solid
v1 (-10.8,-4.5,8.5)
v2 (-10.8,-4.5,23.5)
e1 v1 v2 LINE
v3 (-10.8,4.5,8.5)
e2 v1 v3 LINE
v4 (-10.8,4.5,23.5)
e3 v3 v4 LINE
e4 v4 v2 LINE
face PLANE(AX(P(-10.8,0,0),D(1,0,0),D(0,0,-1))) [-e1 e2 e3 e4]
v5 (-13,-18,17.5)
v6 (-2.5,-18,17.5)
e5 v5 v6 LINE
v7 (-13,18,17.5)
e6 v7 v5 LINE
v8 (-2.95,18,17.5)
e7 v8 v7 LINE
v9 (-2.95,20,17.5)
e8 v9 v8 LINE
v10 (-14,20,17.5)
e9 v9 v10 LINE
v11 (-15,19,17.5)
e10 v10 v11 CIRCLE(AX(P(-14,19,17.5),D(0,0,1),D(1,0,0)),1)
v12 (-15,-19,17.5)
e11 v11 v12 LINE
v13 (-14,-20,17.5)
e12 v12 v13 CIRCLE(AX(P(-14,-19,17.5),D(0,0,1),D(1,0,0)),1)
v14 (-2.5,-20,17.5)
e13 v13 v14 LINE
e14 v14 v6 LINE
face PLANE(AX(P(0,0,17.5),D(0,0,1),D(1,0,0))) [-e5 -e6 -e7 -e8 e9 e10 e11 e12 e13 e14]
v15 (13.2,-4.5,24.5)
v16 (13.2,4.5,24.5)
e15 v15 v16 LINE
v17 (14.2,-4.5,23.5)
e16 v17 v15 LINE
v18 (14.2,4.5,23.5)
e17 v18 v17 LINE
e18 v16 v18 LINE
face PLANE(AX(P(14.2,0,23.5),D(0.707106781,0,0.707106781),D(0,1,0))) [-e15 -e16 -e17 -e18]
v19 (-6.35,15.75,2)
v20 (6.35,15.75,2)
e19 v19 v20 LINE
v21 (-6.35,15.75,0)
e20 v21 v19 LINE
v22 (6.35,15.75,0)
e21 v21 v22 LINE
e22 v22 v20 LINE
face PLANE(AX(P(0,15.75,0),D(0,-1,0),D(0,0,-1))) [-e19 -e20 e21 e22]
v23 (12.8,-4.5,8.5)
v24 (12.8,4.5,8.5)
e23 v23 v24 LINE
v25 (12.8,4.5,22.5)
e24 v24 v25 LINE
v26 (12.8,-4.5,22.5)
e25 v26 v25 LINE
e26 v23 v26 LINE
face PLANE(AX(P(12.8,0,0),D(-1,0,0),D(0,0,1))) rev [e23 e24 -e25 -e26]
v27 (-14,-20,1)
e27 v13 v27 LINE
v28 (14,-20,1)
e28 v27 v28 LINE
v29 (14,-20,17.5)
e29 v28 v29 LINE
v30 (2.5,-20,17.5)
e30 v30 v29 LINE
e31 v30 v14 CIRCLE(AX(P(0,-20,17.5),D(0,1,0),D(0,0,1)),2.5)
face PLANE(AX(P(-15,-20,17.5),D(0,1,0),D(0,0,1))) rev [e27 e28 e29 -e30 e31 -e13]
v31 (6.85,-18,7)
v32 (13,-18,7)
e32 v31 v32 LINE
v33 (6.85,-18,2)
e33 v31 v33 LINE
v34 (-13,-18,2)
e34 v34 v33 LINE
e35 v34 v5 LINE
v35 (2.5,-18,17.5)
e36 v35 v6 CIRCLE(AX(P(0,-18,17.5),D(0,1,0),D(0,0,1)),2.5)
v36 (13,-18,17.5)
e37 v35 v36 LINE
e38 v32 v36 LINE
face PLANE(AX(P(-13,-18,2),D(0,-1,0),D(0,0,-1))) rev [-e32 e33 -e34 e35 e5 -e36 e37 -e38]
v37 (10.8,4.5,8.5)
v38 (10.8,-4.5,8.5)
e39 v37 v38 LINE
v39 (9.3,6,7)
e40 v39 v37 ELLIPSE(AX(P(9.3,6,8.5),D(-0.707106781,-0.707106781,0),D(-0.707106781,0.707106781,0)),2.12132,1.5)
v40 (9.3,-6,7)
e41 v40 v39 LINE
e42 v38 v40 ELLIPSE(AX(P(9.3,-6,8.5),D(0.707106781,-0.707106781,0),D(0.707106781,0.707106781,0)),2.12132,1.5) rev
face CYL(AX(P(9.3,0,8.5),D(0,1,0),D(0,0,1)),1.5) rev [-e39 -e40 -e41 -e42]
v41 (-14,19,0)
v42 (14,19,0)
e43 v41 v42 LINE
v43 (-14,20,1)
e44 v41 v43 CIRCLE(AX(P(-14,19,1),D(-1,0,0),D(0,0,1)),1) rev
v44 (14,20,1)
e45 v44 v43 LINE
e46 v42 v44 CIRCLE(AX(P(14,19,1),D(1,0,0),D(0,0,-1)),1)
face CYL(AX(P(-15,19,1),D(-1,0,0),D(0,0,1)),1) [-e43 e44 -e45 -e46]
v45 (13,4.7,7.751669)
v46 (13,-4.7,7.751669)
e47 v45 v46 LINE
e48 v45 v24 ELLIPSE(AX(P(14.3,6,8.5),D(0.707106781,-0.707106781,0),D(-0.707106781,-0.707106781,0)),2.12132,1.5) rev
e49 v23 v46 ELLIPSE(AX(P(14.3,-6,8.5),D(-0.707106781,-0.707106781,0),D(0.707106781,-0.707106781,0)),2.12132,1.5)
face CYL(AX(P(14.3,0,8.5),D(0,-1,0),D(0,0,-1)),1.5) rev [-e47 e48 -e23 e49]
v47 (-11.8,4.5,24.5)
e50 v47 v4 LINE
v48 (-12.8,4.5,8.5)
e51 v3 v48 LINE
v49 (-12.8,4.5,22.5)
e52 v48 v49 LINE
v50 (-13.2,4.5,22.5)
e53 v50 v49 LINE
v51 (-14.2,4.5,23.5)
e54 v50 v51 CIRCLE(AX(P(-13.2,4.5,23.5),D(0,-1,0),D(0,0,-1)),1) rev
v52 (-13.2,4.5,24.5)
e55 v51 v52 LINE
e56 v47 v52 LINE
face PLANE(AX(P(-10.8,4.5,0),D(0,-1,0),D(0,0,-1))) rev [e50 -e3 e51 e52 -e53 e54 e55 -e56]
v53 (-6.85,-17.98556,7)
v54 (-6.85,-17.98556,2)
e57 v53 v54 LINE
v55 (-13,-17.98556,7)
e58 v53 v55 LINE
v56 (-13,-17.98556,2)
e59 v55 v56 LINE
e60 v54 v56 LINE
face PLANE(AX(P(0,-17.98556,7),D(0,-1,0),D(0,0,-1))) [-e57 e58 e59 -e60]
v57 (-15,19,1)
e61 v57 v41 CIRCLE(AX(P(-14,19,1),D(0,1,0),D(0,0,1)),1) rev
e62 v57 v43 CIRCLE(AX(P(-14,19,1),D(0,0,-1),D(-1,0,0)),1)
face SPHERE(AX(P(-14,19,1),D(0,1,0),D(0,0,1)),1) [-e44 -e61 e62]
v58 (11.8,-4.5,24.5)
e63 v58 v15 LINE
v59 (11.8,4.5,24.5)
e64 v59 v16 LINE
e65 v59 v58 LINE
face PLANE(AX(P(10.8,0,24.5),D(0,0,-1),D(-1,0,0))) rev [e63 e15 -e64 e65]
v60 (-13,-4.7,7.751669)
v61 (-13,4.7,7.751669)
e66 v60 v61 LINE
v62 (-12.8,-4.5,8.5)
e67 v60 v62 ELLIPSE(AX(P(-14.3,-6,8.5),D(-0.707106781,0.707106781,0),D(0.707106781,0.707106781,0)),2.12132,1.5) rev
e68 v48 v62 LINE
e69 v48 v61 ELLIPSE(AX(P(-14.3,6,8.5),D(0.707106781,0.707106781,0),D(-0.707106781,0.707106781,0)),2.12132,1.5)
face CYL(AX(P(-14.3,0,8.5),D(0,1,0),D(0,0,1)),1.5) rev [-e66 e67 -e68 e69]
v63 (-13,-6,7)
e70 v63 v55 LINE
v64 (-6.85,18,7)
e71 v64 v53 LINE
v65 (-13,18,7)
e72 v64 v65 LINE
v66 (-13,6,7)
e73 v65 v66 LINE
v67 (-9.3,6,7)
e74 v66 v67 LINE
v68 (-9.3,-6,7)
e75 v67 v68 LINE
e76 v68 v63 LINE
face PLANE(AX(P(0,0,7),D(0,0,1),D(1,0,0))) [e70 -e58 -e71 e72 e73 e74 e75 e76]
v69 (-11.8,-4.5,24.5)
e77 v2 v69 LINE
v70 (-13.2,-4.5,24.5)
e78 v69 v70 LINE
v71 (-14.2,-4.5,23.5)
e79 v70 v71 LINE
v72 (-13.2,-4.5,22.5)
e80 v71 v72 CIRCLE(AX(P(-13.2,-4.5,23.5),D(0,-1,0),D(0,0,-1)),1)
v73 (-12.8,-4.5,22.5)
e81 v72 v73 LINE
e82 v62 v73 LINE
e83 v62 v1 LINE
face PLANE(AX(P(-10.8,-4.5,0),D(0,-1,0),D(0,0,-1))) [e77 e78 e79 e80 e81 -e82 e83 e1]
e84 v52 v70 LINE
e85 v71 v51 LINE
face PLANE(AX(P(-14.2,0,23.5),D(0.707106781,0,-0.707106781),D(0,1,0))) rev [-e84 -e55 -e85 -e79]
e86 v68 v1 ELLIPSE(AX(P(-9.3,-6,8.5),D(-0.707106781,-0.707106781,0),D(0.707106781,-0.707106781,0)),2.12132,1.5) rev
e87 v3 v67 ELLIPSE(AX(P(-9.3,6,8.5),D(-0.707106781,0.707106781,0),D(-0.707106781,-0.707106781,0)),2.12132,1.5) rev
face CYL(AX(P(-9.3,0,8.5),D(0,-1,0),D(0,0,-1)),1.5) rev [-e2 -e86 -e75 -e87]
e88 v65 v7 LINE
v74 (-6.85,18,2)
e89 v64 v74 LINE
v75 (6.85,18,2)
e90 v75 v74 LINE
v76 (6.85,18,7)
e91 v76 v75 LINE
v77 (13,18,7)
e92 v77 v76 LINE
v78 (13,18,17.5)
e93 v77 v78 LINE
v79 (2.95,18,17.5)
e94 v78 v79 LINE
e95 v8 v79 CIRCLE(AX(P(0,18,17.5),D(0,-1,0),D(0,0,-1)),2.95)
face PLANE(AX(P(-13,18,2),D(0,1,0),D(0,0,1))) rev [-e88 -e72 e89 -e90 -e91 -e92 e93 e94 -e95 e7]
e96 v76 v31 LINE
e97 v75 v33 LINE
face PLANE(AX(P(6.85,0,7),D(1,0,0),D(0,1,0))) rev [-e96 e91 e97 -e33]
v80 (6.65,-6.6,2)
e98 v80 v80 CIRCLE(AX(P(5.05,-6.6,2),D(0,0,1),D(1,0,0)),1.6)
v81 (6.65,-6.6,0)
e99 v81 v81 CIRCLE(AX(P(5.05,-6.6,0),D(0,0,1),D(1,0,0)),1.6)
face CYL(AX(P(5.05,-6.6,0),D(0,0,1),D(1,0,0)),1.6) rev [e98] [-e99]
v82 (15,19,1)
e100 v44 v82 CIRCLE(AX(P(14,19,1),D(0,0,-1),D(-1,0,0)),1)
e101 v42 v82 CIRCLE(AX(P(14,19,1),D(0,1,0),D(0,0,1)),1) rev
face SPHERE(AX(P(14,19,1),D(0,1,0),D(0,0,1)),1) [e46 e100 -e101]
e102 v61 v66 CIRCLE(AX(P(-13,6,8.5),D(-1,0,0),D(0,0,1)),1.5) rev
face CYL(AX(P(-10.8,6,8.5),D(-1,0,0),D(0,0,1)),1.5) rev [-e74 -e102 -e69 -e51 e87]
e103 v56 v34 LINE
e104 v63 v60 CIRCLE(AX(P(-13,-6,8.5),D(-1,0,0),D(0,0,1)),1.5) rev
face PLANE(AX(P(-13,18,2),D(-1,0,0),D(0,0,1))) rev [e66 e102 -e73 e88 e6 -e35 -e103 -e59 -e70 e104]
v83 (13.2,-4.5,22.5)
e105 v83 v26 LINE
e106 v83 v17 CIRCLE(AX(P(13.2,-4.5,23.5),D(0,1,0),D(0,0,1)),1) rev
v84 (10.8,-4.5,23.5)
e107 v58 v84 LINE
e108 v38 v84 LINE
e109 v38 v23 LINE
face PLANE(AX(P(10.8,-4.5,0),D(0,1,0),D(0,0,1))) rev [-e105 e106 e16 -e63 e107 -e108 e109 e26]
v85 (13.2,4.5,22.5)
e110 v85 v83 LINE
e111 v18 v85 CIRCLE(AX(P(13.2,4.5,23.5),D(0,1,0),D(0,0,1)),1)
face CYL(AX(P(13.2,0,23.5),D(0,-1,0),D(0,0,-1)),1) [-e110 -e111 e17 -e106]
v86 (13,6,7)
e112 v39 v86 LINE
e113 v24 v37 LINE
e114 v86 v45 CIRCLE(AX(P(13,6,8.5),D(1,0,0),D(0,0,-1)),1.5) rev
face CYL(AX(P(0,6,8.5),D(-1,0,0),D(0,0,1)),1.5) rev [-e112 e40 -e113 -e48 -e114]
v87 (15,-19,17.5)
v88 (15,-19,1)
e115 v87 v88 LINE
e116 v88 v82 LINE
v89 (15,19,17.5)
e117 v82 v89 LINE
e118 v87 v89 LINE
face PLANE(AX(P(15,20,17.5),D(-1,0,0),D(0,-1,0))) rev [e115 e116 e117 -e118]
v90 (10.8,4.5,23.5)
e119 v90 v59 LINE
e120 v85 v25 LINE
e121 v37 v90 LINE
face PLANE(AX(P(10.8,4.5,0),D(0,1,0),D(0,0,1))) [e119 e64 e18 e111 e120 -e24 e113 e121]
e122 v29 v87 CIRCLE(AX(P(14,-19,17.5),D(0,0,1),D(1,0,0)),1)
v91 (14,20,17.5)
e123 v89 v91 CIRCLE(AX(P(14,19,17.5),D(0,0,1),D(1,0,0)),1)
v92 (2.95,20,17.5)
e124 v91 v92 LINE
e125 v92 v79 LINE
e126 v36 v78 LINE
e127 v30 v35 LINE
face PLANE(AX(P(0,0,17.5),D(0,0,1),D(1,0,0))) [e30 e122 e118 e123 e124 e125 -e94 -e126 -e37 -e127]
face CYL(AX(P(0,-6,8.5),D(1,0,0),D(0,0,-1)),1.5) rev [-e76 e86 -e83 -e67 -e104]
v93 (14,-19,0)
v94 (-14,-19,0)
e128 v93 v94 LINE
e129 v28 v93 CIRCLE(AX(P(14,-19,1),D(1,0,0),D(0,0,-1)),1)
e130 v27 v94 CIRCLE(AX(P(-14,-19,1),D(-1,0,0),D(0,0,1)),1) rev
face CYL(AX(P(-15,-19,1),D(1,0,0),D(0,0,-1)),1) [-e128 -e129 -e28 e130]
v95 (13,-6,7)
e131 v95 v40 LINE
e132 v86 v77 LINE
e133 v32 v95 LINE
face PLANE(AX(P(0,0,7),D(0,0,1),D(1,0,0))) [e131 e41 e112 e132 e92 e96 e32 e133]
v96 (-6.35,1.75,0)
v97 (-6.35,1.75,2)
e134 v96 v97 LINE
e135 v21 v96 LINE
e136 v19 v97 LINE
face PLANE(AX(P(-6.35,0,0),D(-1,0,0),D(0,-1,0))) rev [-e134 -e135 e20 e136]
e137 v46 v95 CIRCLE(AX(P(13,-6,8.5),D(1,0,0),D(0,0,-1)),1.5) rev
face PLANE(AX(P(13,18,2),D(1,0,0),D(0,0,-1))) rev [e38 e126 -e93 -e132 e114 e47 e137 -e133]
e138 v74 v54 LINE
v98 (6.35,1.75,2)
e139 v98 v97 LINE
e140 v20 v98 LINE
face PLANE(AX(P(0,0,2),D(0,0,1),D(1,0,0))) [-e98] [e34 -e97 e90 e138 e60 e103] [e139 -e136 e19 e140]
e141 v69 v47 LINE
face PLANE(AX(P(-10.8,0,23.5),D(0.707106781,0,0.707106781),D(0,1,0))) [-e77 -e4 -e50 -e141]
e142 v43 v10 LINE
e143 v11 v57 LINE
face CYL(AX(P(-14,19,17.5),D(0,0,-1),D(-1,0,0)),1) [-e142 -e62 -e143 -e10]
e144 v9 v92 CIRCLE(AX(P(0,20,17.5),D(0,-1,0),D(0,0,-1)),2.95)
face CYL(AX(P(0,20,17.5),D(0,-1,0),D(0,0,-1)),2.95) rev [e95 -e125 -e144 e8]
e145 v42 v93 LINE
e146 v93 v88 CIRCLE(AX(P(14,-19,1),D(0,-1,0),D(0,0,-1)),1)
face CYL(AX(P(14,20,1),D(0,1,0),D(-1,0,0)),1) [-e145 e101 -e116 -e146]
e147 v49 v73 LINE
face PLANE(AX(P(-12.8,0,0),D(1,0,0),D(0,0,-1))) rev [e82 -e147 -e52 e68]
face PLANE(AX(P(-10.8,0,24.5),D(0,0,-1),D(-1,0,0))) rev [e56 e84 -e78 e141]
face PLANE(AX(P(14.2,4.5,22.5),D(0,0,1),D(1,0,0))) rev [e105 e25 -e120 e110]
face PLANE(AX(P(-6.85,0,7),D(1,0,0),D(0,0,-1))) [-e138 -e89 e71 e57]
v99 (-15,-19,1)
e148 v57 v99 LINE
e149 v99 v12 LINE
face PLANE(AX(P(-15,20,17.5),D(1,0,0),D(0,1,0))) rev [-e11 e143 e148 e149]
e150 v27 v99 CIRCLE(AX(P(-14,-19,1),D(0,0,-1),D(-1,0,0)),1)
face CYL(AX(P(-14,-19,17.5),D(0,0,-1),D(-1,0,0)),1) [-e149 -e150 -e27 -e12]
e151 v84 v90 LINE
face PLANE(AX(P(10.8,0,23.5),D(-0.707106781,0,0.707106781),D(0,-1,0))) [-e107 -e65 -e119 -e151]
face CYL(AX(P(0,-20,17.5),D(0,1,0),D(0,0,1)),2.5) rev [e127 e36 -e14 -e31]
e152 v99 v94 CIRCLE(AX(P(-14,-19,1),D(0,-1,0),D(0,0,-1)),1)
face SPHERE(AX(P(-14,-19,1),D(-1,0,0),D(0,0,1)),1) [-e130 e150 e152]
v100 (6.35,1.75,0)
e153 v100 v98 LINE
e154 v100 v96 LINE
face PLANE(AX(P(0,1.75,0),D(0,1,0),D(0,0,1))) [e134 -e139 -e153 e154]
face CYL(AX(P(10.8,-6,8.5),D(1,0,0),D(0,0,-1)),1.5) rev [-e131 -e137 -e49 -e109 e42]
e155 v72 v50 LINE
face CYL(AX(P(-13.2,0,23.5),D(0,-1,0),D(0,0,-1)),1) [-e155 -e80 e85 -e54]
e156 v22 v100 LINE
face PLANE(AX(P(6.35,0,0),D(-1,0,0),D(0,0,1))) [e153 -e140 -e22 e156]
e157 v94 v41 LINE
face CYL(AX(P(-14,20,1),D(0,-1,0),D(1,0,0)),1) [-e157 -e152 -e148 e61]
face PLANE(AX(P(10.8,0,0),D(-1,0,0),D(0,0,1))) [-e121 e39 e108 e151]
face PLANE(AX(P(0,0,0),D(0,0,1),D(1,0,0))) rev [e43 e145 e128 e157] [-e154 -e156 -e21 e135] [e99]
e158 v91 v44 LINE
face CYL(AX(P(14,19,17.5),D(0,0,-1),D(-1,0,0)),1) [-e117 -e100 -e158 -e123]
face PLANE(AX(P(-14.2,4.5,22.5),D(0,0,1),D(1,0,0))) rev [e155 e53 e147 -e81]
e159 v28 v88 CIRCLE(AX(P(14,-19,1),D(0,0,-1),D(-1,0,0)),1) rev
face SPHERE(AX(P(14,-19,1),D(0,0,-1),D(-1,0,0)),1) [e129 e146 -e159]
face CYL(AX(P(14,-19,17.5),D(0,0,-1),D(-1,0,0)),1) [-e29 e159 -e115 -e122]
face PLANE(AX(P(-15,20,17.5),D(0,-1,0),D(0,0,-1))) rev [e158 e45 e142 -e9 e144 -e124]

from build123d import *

# Parameters (mm, degrees)
SKETCH1_W           = 30
SKETCH1_H           = 40
BOSS_EXTRUDE1_DEPTH = 17.5
SKETCH2_W           = 26
SKETCH2_H           = 36
CUT_EXTRUDE1_DEPTH  = 15.5
SKETCH3_R           = 1.6
CUT_EXTRUDE2_DEPTH  = 30.41513216
BOSS_EXTRUDE2_DEPTH = 5
CUT_EXTRUDE3_DEPTH  = 45.443784717
CUT_EXTRUDE4_DEPTH  = 45.443784717
BOSS_EXTRUDE3_START = 0.2
SKETCH6_W           = 7
SKETCH6_H           = 9
SKETCH6_W_2         = 10.5
BOSS_EXTRUDE3_DEPTH = 2
FILLET2_R           = 1
BOSS_EXTRUDE7_START = 0.2
SKETCH7_W           = 17.5
SKETCH7_H           = 9
BOSS_EXTRUDE7_DEPTH = 2
SKETCH8_W           = 2
SKETCH8_H           = 9
BOSS_EXTRUDE8_DEPTH = 1.4
FILLET6_R           = 1.5
SKETCH9_W           = 2
SKETCH9_H           = 9
BOSS_EXTRUDE9_DEPTH = 1.4
CHAMFER1_SIZE       = 1
FILLET7_R           = 1


# Some blends are built 0.0001 mm under size
with BuildPart() as part:
    # Sketch1 → Boss-Extrude1 (new body)
    with BuildSketch(Plane.XY):
        Rectangle(SKETCH1_W, SKETCH1_H)
    extrude(amount=BOSS_EXTRUDE1_DEPTH)

    # Sketch2 → Cut-Extrude1 (cut)
    with BuildSketch(Plane.XY.offset(17.5)):
        Rectangle(SKETCH2_W, SKETCH2_H)
    extrude(amount=-CUT_EXTRUDE1_DEPTH, mode=Mode.SUBTRACT)

    # Sketch3 → Cut-Extrude2 (cut, through all)
    with BuildSketch(Plane.XY.offset(2)):
        Polygon((6.35, 1.75), (-6.35, 1.75), (-6.35, 15.75), (0, 15.75), (6.35, 15.75), align=None)
        with Locations((5.05, -6.6)):
            Circle(SKETCH3_R)
    extrude(amount=-CUT_EXTRUDE2_DEPTH, mode=Mode.SUBTRACT)

    # Sketch3<3> → Boss-Extrude2 (add)
    with BuildSketch(Plane.XY.offset(2)):
        Polygon((-6.85, -14), (-6.85, 18), (-13, 18), (-13, -17.985559901), (-6.85, -17.985559901), align=None)
        Polygon((13, 18), (6.85, 18), (6.85, -14), (6.85, -18), (13, -18), align=None)
    extrude(amount=BOSS_EXTRUDE2_DEPTH)

    # Sketch4 → Cut-Extrude3 (cut, through all)
    with BuildSketch(Plane.XZ.offset(-18)):
        with BuildLine():
            Line((-2.95, 17.5), (2.95, 17.5))
            ThreePointArc((2.95, 17.5), (0, 14.55), (-2.95, 17.5))
        make_face()
    extrude(amount=-CUT_EXTRUDE3_DEPTH, mode=Mode.SUBTRACT)

    # Sketch5 → Cut-Extrude4 (cut, through all)
    with BuildSketch(Plane(origin=(0, -18, 0), x_dir=(1, 0, 0), z_dir=(0, 1, 0))):
        with BuildLine():
            Line((-2.5, -17.5), (2.5, -17.5))
            ThreePointArc((2.5, -17.5), (0, -15), (-2.5, -17.5))
        make_face()
    extrude(amount=-CUT_EXTRUDE4_DEPTH, mode=Mode.SUBTRACT)

    # Sketch6 → Boss-Extrude3 (add)
    with BuildSketch(Plane.ZY.offset(-13).offset(BOSS_EXTRUDE3_START)):
        with Locations((21, 0)):
            Rectangle(SKETCH6_W, SKETCH6_H)
        with Locations((12.25, 0)):
            Rectangle(SKETCH6_W_2, SKETCH6_H)
    extrude(amount=BOSS_EXTRUDE3_DEPTH)

    # Fillet2
    fillet2_edges = [part.edges().sort_by_distance(p)[0] for p in [
        (0, -20, 0),
        (-15, 0, 0),
        (0, 20, 0),
        (15, 0, 0),
        (15, -20, 8.75),
        (-15, -20, 8.75),
        (-15, 20, 8.75),
        (15, 20, 8.75),
    ]]
    fillet(fillet2_edges, radius=FILLET2_R)

    # Sketch7 → Boss-Extrude7 (add)
    with BuildSketch(Plane(origin=(-13, 0, 0), x_dir=(0, 0, -1), z_dir=(1, 0, 0)).offset(BOSS_EXTRUDE7_START)):
        with Locations((-15.75, 0)):
            Rectangle(SKETCH7_W, SKETCH7_H)
    extrude(amount=BOSS_EXTRUDE7_DEPTH)

    # Sketch8 → Boss-Extrude8 (add)
    with BuildSketch(Plane.ZY.offset(12.8)):
        with Locations((23.5, 0)):
            Rectangle(SKETCH8_W, SKETCH8_H)
    extrude(amount=BOSS_EXTRUDE8_DEPTH)

    # Fillet6
    # the kernel refuses this fillet: 1.5 mm, written as the material it adds along each edge
    with BuildSketch(Plane(origin=(12.8, -4.5, 7), x_dir=(0, -1, 0), z_dir=(-1, 0, 0)), Plane(origin=(-12.8, 4.5, 7), x_dir=(0, 1, 0), z_dir=(1, 0, 0))) as fillet6_piece_1:
        with BuildLine():
            CenterArc((FILLET6_R, FILLET6_R), FILLET6_R, 180, 90)
            Line((0, FILLET6_R), (-FILLET6_R * 0.02, FILLET6_R))
            Line((-FILLET6_R * 0.02, FILLET6_R), (-FILLET6_R * 0.02, -FILLET6_R * 0.02))
            Line((-FILLET6_R * 0.02, -FILLET6_R * 0.02), (FILLET6_R, -FILLET6_R * 0.02))
            Line((FILLET6_R, -FILLET6_R * 0.02), (FILLET6_R, 0))
        make_face()
    extrude(amount=2)
    with BuildSketch(Plane(origin=(12.8, 4.5, 7), x_dir=(1, 0, 0), z_dir=(0, -1, 0)), Plane(origin=(-12.8, -4.5, 7), x_dir=(-1, 0, 0), z_dir=(0, 1, 0))) as fillet6_piece_2:
        with BuildLine():
            CenterArc((FILLET6_R, FILLET6_R), FILLET6_R, 180, 90)
            Line((0, FILLET6_R), (-FILLET6_R * 0.02, FILLET6_R))
            Line((-FILLET6_R * 0.02, FILLET6_R), (-FILLET6_R * 0.02, -FILLET6_R * 0.02))
            Line((-FILLET6_R * 0.02, -FILLET6_R * 0.02), (FILLET6_R, -FILLET6_R * 0.02))
            Line((FILLET6_R, -FILLET6_R * 0.02), (FILLET6_R, 0))
        make_face()
    extrude(amount=9)
    with BuildSketch(Plane(origin=(12.8, 4.5, 7), x_dir=(0, 1, 0), z_dir=(-1, 0, 0)), Plane(origin=(-12.8, -4.5, 7), x_dir=(0, -1, 0), z_dir=(1, 0, 0))) as fillet6_piece_3:
        with BuildLine():
            CenterArc((FILLET6_R, -FILLET6_R), FILLET6_R, 90, 90)
            Line((0, -FILLET6_R), (-FILLET6_R * 0.02, -FILLET6_R))
            Line((-FILLET6_R * 0.02, -FILLET6_R), (-FILLET6_R * 0.02, FILLET6_R * 0.02))
            Line((-FILLET6_R * 0.02, FILLET6_R * 0.02), (FILLET6_R, FILLET6_R * 0.02))
            Line((FILLET6_R, FILLET6_R * 0.02), (FILLET6_R, 0))
        make_face()
    extrude(amount=2)
    with BuildSketch(Plane(origin=(10.8, 4.5, 7), x_dir=(-1, 0, 0), z_dir=(0, -1, 0)), Plane(origin=(-10.8, -4.5, 7), x_dir=(1, 0, 0), z_dir=(0, 1, 0))) as fillet6_piece_4:
        with BuildLine():
            CenterArc((FILLET6_R, -FILLET6_R), FILLET6_R, 90, 90)
            Line((0, -FILLET6_R), (-FILLET6_R * 0.02, -FILLET6_R))
            Line((-FILLET6_R * 0.02, -FILLET6_R), (-FILLET6_R * 0.02, FILLET6_R * 0.02))
            Line((-FILLET6_R * 0.02, FILLET6_R * 0.02), (FILLET6_R, FILLET6_R * 0.02))
            Line((FILLET6_R, FILLET6_R * 0.02), (FILLET6_R, 0))
        make_face()
    extrude(amount=9)
    with BuildSketch(Plane(origin=(12.8, 4.5, 7), x_dir=(1, 0, 0), z_dir=(0, -1, 0))) as fillet6_piece_5a_section:
        with BuildLine():
            CenterArc((FILLET6_R, FILLET6_R), FILLET6_R, 180, 90)
            Line((0, FILLET6_R), (-FILLET6_R * 0.02, FILLET6_R))
            Line((-FILLET6_R * 0.02, FILLET6_R), (-FILLET6_R * 0.02, -FILLET6_R * 0.02))
            Line((-FILLET6_R * 0.02, -FILLET6_R * 0.02), (FILLET6_R, -FILLET6_R * 0.02))
            Line((FILLET6_R, -FILLET6_R * 0.02), (FILLET6_R, 0))
        make_face()
    fillet6_piece_5a = extrude(amount=12.75, mode=Mode.PRIVATE)
    fillet6_piece_5a = split(fillet6_piece_5a, bisect_by=Plane(origin=(13.139592671, -4.5, 7.339592671), z_dir=(0, -1, 0)), keep=Keep.TOP, mode=Mode.PRIVATE)
    with BuildSketch(Plane(origin=(16.55, -4.5, 7), x_dir=(0, -1, 0), z_dir=(-1, 0, 0))) as fillet6_piece_5b_section:
        with BuildLine():
            CenterArc((FILLET6_R, FILLET6_R), FILLET6_R, 180, 90)
            Line((0, FILLET6_R), (-FILLET6_R * 0.02, FILLET6_R))
            Line((-FILLET6_R * 0.02, FILLET6_R), (-FILLET6_R * 0.02, -FILLET6_R * 0.02))
            Line((-FILLET6_R * 0.02, -FILLET6_R * 0.02), (FILLET6_R, -FILLET6_R * 0.02))
            Line((FILLET6_R, -FILLET6_R * 0.02), (FILLET6_R, 0))
        make_face()
    fillet6_piece_5b = extrude(amount=5.75, mode=Mode.PRIVATE)
    fillet6_piece_5b = split(fillet6_piece_5b, bisect_by=Plane(origin=(12.8, -4.839592671, 7.339592671), z_dir=(1, 0, 0)), keep=Keep.TOP, mode=Mode.PRIVATE)
    fillet6_piece_5 = fillet6_piece_5a & fillet6_piece_5b
    add(fillet6_piece_5)
    with BuildSketch(Plane(origin=(10.8, 4.5, 7), x_dir=(-1, 0, 0), z_dir=(0, -1, 0))) as fillet6_piece_6a_section:
        with BuildLine():
            CenterArc((FILLET6_R, -FILLET6_R), FILLET6_R, 90, 90)
            Line((0, -FILLET6_R), (-FILLET6_R * 0.02, -FILLET6_R))
            Line((-FILLET6_R * 0.02, -FILLET6_R), (-FILLET6_R * 0.02, FILLET6_R * 0.02))
            Line((-FILLET6_R * 0.02, FILLET6_R * 0.02), (FILLET6_R, FILLET6_R * 0.02))
            Line((FILLET6_R, FILLET6_R * 0.02), (FILLET6_R, 0))
        make_face()
    fillet6_piece_6a = extrude(amount=12.75, mode=Mode.PRIVATE)
    fillet6_piece_6a = split(fillet6_piece_6a, bisect_by=Plane(origin=(10.460407329, -4.5, 7.339592671), z_dir=(0, -1, 0)), keep=Keep.TOP, mode=Mode.PRIVATE)
    with BuildSketch(Plane(origin=(12.8, -4.5, 7), x_dir=(0, -1, 0), z_dir=(-1, 0, 0))) as fillet6_piece_6b_section:
        with BuildLine():
            CenterArc((FILLET6_R, FILLET6_R), FILLET6_R, 180, 90)
            Line((0, FILLET6_R), (-FILLET6_R * 0.02, FILLET6_R))
            Line((-FILLET6_R * 0.02, FILLET6_R), (-FILLET6_R * 0.02, -FILLET6_R * 0.02))
            Line((-FILLET6_R * 0.02, -FILLET6_R * 0.02), (FILLET6_R, -FILLET6_R * 0.02))
            Line((FILLET6_R, -FILLET6_R * 0.02), (FILLET6_R, 0))
        make_face()
    fillet6_piece_6b = extrude(amount=5.75, mode=Mode.PRIVATE)
    fillet6_piece_6b = split(fillet6_piece_6b, bisect_by=Plane(origin=(10.8, -4.839592671, 7.339592671), z_dir=(-1, 0, 0)), keep=Keep.TOP, mode=Mode.PRIVATE)
    fillet6_piece_6 = fillet6_piece_6a & fillet6_piece_6b
    add(fillet6_piece_6)
    with BuildSketch(Plane(origin=(12.8, 8.25, 7), x_dir=(1, 0, 0), z_dir=(0, -1, 0))) as fillet6_piece_7a_section:
        with BuildLine():
            CenterArc((FILLET6_R, FILLET6_R), FILLET6_R, 180, 90)
            Line((0, FILLET6_R), (-FILLET6_R * 0.02, FILLET6_R))
            Line((-FILLET6_R * 0.02, FILLET6_R), (-FILLET6_R * 0.02, -FILLET6_R * 0.02))
            Line((-FILLET6_R * 0.02, -FILLET6_R * 0.02), (FILLET6_R, -FILLET6_R * 0.02))
            Line((FILLET6_R, -FILLET6_R * 0.02), (FILLET6_R, 0))
        make_face()
    fillet6_piece_7a = extrude(amount=12.75, mode=Mode.PRIVATE)
    fillet6_piece_7a = split(fillet6_piece_7a, bisect_by=Plane(origin=(13.139592671, 4.5, 7.339592671), z_dir=(0, 1, 0)), keep=Keep.TOP, mode=Mode.PRIVATE)
    with BuildSketch(Plane(origin=(16.55, 4.5, 7), x_dir=(0, 1, 0), z_dir=(-1, 0, 0))) as fillet6_piece_7b_section:
        with BuildLine():
            CenterArc((FILLET6_R, -FILLET6_R), FILLET6_R, 90, 90)
            Line((0, -FILLET6_R), (-FILLET6_R * 0.02, -FILLET6_R))
            Line((-FILLET6_R * 0.02, -FILLET6_R), (-FILLET6_R * 0.02, FILLET6_R * 0.02))
            Line((-FILLET6_R * 0.02, FILLET6_R * 0.02), (FILLET6_R, FILLET6_R * 0.02))
            Line((FILLET6_R, FILLET6_R * 0.02), (FILLET6_R, 0))
        make_face()
    fillet6_piece_7b = extrude(amount=5.75, mode=Mode.PRIVATE)
    fillet6_piece_7b = split(fillet6_piece_7b, bisect_by=Plane(origin=(12.8, 4.839592671, 7.339592671), z_dir=(1, 0, 0)), keep=Keep.TOP, mode=Mode.PRIVATE)
    fillet6_piece_7 = fillet6_piece_7a & fillet6_piece_7b
    add(fillet6_piece_7)
    with BuildSketch(Plane(origin=(12.8, 4.5, 7), x_dir=(0, 1, 0), z_dir=(-1, 0, 0))) as fillet6_piece_8a_section:
        with BuildLine():
            CenterArc((FILLET6_R, -FILLET6_R), FILLET6_R, 90, 90)
            Line((0, -FILLET6_R), (-FILLET6_R * 0.02, -FILLET6_R))
            Line((-FILLET6_R * 0.02, -FILLET6_R), (-FILLET6_R * 0.02, FILLET6_R * 0.02))
            Line((-FILLET6_R * 0.02, FILLET6_R * 0.02), (FILLET6_R, FILLET6_R * 0.02))
            Line((FILLET6_R, FILLET6_R * 0.02), (FILLET6_R, 0))
        make_face()
    fillet6_piece_8a = extrude(amount=5.75, mode=Mode.PRIVATE)
    fillet6_piece_8a = split(fillet6_piece_8a, bisect_by=Plane(origin=(10.8, 4.839592671, 7.339592671), z_dir=(-1, 0, 0)), keep=Keep.TOP, mode=Mode.PRIVATE)
    with BuildSketch(Plane(origin=(10.8, 8.25, 7), x_dir=(-1, 0, 0), z_dir=(0, -1, 0))) as fillet6_piece_8b_section:
        with BuildLine():
            CenterArc((FILLET6_R, -FILLET6_R), FILLET6_R, 90, 90)
            Line((0, -FILLET6_R), (-FILLET6_R * 0.02, -FILLET6_R))
            Line((-FILLET6_R * 0.02, -FILLET6_R), (-FILLET6_R * 0.02, FILLET6_R * 0.02))
            Line((-FILLET6_R * 0.02, FILLET6_R * 0.02), (FILLET6_R, FILLET6_R * 0.02))
            Line((FILLET6_R, FILLET6_R * 0.02), (FILLET6_R, 0))
        make_face()
    fillet6_piece_8b = extrude(amount=12.75, mode=Mode.PRIVATE)
    fillet6_piece_8b = split(fillet6_piece_8b, bisect_by=Plane(origin=(10.460407329, 4.5, 7.339592671), z_dir=(0, 1, 0)), keep=Keep.TOP, mode=Mode.PRIVATE)
    fillet6_piece_8 = fillet6_piece_8a & fillet6_piece_8b
    add(fillet6_piece_8)
    with BuildSketch(Plane(origin=(-16.55, 4.5, 7), x_dir=(0, 1, 0), z_dir=(1, 0, 0))) as fillet6_piece_9a_section:
        with BuildLine():
            CenterArc((FILLET6_R, FILLET6_R), FILLET6_R, 180, 90)
            Line((0, FILLET6_R), (-FILLET6_R * 0.02, FILLET6_R))
            Line((-FILLET6_R * 0.02, FILLET6_R), (-FILLET6_R * 0.02, -FILLET6_R * 0.02))
            Line((-FILLET6_R * 0.02, -FILLET6_R * 0.02), (FILLET6_R, -FILLET6_R * 0.02))
            Line((FILLET6_R, -FILLET6_R * 0.02), (FILLET6_R, 0))
        make_face()
    fillet6_piece_9a = extrude(amount=5.75, mode=Mode.PRIVATE)
    fillet6_piece_9a = split(fillet6_piece_9a, bisect_by=Plane(origin=(-12.8, 4.839592671, 7.339592671), z_dir=(-1, 0, 0)), keep=Keep.TOP, mode=Mode.PRIVATE)
    with BuildSketch(Plane(origin=(-12.8, -4.5, 7), x_dir=(-1, 0, 0), z_dir=(0, 1, 0))) as fillet6_piece_9b_section:
        with BuildLine():
            CenterArc((FILLET6_R, FILLET6_R), FILLET6_R, 180, 90)
            Line((0, FILLET6_R), (-FILLET6_R * 0.02, FILLET6_R))
            Line((-FILLET6_R * 0.02, FILLET6_R), (-FILLET6_R * 0.02, -FILLET6_R * 0.02))
            Line((-FILLET6_R * 0.02, -FILLET6_R * 0.02), (FILLET6_R, -FILLET6_R * 0.02))
            Line((FILLET6_R, -FILLET6_R * 0.02), (FILLET6_R, 0))
        make_face()
    fillet6_piece_9b = extrude(amount=12.75, mode=Mode.PRIVATE)
    fillet6_piece_9b = split(fillet6_piece_9b, bisect_by=Plane(origin=(-13.139592671, 4.5, 7.339592671), z_dir=(0, 1, 0)), keep=Keep.TOP, mode=Mode.PRIVATE)
    fillet6_piece_9 = fillet6_piece_9a & fillet6_piece_9b
    add(fillet6_piece_9)
    with BuildSketch(Plane(origin=(-10.8, -4.5, 7), x_dir=(1, 0, 0), z_dir=(0, 1, 0))) as fillet6_piece_10a_section:
        with BuildLine():
            CenterArc((FILLET6_R, -FILLET6_R), FILLET6_R, 90, 90)
            Line((0, -FILLET6_R), (-FILLET6_R * 0.02, -FILLET6_R))
            Line((-FILLET6_R * 0.02, -FILLET6_R), (-FILLET6_R * 0.02, FILLET6_R * 0.02))
            Line((-FILLET6_R * 0.02, FILLET6_R * 0.02), (FILLET6_R, FILLET6_R * 0.02))
            Line((FILLET6_R, FILLET6_R * 0.02), (FILLET6_R, 0))
        make_face()
    fillet6_piece_10a = extrude(amount=12.75, mode=Mode.PRIVATE)
    fillet6_piece_10a = split(fillet6_piece_10a, bisect_by=Plane(origin=(-10.460407329, 4.5, 7.339592671), z_dir=(0, 1, 0)), keep=Keep.TOP, mode=Mode.PRIVATE)
    with BuildSketch(Plane(origin=(-12.8, 4.5, 7), x_dir=(0, 1, 0), z_dir=(1, 0, 0))) as fillet6_piece_10b_section:
        with BuildLine():
            CenterArc((FILLET6_R, FILLET6_R), FILLET6_R, 180, 90)
            Line((0, FILLET6_R), (-FILLET6_R * 0.02, FILLET6_R))
            Line((-FILLET6_R * 0.02, FILLET6_R), (-FILLET6_R * 0.02, -FILLET6_R * 0.02))
            Line((-FILLET6_R * 0.02, -FILLET6_R * 0.02), (FILLET6_R, -FILLET6_R * 0.02))
            Line((FILLET6_R, -FILLET6_R * 0.02), (FILLET6_R, 0))
        make_face()
    fillet6_piece_10b = extrude(amount=5.75, mode=Mode.PRIVATE)
    fillet6_piece_10b = split(fillet6_piece_10b, bisect_by=Plane(origin=(-10.8, 4.839592671, 7.339592671), z_dir=(1, 0, 0)), keep=Keep.TOP, mode=Mode.PRIVATE)
    fillet6_piece_10 = fillet6_piece_10a & fillet6_piece_10b
    add(fillet6_piece_10)
    with BuildSketch(Plane(origin=(-16.55, -4.5, 7), x_dir=(0, -1, 0), z_dir=(1, 0, 0))) as fillet6_piece_11a_section:
        with BuildLine():
            CenterArc((FILLET6_R, -FILLET6_R), FILLET6_R, 90, 90)
            Line((0, -FILLET6_R), (-FILLET6_R * 0.02, -FILLET6_R))
            Line((-FILLET6_R * 0.02, -FILLET6_R), (-FILLET6_R * 0.02, FILLET6_R * 0.02))
            Line((-FILLET6_R * 0.02, FILLET6_R * 0.02), (FILLET6_R, FILLET6_R * 0.02))
            Line((FILLET6_R, FILLET6_R * 0.02), (FILLET6_R, 0))
        make_face()
    fillet6_piece_11a = extrude(amount=5.75, mode=Mode.PRIVATE)
    fillet6_piece_11a = split(fillet6_piece_11a, bisect_by=Plane(origin=(-12.8, -4.839592671, 7.339592671), z_dir=(-1, 0, 0)), keep=Keep.TOP, mode=Mode.PRIVATE)
    with BuildSketch(Plane(origin=(-12.8, -8.25, 7), x_dir=(-1, 0, 0), z_dir=(0, 1, 0))) as fillet6_piece_11b_section:
        with BuildLine():
            CenterArc((FILLET6_R, FILLET6_R), FILLET6_R, 180, 90)
            Line((0, FILLET6_R), (-FILLET6_R * 0.02, FILLET6_R))
            Line((-FILLET6_R * 0.02, FILLET6_R), (-FILLET6_R * 0.02, -FILLET6_R * 0.02))
            Line((-FILLET6_R * 0.02, -FILLET6_R * 0.02), (FILLET6_R, -FILLET6_R * 0.02))
            Line((FILLET6_R, -FILLET6_R * 0.02), (FILLET6_R, 0))
        make_face()
    fillet6_piece_11b = extrude(amount=12.75, mode=Mode.PRIVATE)
    fillet6_piece_11b = split(fillet6_piece_11b, bisect_by=Plane(origin=(-13.139592671, -4.5, 7.339592671), z_dir=(0, -1, 0)), keep=Keep.TOP, mode=Mode.PRIVATE)
    fillet6_piece_11 = fillet6_piece_11a & fillet6_piece_11b
    add(fillet6_piece_11)
    with BuildSketch(Plane(origin=(-12.8, -4.5, 7), x_dir=(0, -1, 0), z_dir=(1, 0, 0))) as fillet6_piece_12a_section:
        with BuildLine():
            CenterArc((FILLET6_R, -FILLET6_R), FILLET6_R, 90, 90)
            Line((0, -FILLET6_R), (-FILLET6_R * 0.02, -FILLET6_R))
            Line((-FILLET6_R * 0.02, -FILLET6_R), (-FILLET6_R * 0.02, FILLET6_R * 0.02))
            Line((-FILLET6_R * 0.02, FILLET6_R * 0.02), (FILLET6_R, FILLET6_R * 0.02))
            Line((FILLET6_R, FILLET6_R * 0.02), (FILLET6_R, 0))
        make_face()
    fillet6_piece_12a = extrude(amount=5.75, mode=Mode.PRIVATE)
    fillet6_piece_12a = split(fillet6_piece_12a, bisect_by=Plane(origin=(-10.8, -4.839592671, 7.339592671), z_dir=(1, 0, 0)), keep=Keep.TOP, mode=Mode.PRIVATE)
    with BuildSketch(Plane(origin=(-10.8, -8.25, 7), x_dir=(1, 0, 0), z_dir=(0, 1, 0))) as fillet6_piece_12b_section:
        with BuildLine():
            CenterArc((FILLET6_R, -FILLET6_R), FILLET6_R, 90, 90)
            Line((0, -FILLET6_R), (-FILLET6_R * 0.02, -FILLET6_R))
            Line((-FILLET6_R * 0.02, -FILLET6_R), (-FILLET6_R * 0.02, FILLET6_R * 0.02))
            Line((-FILLET6_R * 0.02, FILLET6_R * 0.02), (FILLET6_R, FILLET6_R * 0.02))
            Line((FILLET6_R, FILLET6_R * 0.02), (FILLET6_R, 0))
        make_face()
    fillet6_piece_12b = extrude(amount=12.75, mode=Mode.PRIVATE)
    fillet6_piece_12b = split(fillet6_piece_12b, bisect_by=Plane(origin=(-10.460407329, -4.5, 7.339592671), z_dir=(0, -1, 0)), keep=Keep.TOP, mode=Mode.PRIVATE)
    fillet6_piece_12 = fillet6_piece_12a & fillet6_piece_12b
    add(fillet6_piece_12)

    # Sketch9 → Boss-Extrude9 (add)
    with BuildSketch(Plane(origin=(12.8, 0, 0), x_dir=(0, 0, -1), z_dir=(1, 0, 0))):
        with Locations((-23.5, 0)):
            Rectangle(SKETCH9_W, SKETCH9_H)
    extrude(amount=BOSS_EXTRUDE9_DEPTH)

    # Chamfer1
    chamfer1_edges = [part.edges().sort_by_distance(p)[0] for p in [
        (10.8, 0, 24.5),
        (-10.8, 0, 24.5),
        (-14.2, 0, 24.5),
        (14.2, 0, 24.5),
    ]]
    chamfer(chamfer1_edges, length=CHAMFER1_SIZE)

    # Fillet7
    fillet7_edges = [part.edges().sort_by_distance(p)[0] for p in [
        (-14.2, 0, 22.5),
        (14.2, 0, 22.5),
    ]]
    fillet(fillet7_edges, radius=FILLET7_R - 0.0001)  # a hair under: the kernel refuses the full size


solid = part.part
